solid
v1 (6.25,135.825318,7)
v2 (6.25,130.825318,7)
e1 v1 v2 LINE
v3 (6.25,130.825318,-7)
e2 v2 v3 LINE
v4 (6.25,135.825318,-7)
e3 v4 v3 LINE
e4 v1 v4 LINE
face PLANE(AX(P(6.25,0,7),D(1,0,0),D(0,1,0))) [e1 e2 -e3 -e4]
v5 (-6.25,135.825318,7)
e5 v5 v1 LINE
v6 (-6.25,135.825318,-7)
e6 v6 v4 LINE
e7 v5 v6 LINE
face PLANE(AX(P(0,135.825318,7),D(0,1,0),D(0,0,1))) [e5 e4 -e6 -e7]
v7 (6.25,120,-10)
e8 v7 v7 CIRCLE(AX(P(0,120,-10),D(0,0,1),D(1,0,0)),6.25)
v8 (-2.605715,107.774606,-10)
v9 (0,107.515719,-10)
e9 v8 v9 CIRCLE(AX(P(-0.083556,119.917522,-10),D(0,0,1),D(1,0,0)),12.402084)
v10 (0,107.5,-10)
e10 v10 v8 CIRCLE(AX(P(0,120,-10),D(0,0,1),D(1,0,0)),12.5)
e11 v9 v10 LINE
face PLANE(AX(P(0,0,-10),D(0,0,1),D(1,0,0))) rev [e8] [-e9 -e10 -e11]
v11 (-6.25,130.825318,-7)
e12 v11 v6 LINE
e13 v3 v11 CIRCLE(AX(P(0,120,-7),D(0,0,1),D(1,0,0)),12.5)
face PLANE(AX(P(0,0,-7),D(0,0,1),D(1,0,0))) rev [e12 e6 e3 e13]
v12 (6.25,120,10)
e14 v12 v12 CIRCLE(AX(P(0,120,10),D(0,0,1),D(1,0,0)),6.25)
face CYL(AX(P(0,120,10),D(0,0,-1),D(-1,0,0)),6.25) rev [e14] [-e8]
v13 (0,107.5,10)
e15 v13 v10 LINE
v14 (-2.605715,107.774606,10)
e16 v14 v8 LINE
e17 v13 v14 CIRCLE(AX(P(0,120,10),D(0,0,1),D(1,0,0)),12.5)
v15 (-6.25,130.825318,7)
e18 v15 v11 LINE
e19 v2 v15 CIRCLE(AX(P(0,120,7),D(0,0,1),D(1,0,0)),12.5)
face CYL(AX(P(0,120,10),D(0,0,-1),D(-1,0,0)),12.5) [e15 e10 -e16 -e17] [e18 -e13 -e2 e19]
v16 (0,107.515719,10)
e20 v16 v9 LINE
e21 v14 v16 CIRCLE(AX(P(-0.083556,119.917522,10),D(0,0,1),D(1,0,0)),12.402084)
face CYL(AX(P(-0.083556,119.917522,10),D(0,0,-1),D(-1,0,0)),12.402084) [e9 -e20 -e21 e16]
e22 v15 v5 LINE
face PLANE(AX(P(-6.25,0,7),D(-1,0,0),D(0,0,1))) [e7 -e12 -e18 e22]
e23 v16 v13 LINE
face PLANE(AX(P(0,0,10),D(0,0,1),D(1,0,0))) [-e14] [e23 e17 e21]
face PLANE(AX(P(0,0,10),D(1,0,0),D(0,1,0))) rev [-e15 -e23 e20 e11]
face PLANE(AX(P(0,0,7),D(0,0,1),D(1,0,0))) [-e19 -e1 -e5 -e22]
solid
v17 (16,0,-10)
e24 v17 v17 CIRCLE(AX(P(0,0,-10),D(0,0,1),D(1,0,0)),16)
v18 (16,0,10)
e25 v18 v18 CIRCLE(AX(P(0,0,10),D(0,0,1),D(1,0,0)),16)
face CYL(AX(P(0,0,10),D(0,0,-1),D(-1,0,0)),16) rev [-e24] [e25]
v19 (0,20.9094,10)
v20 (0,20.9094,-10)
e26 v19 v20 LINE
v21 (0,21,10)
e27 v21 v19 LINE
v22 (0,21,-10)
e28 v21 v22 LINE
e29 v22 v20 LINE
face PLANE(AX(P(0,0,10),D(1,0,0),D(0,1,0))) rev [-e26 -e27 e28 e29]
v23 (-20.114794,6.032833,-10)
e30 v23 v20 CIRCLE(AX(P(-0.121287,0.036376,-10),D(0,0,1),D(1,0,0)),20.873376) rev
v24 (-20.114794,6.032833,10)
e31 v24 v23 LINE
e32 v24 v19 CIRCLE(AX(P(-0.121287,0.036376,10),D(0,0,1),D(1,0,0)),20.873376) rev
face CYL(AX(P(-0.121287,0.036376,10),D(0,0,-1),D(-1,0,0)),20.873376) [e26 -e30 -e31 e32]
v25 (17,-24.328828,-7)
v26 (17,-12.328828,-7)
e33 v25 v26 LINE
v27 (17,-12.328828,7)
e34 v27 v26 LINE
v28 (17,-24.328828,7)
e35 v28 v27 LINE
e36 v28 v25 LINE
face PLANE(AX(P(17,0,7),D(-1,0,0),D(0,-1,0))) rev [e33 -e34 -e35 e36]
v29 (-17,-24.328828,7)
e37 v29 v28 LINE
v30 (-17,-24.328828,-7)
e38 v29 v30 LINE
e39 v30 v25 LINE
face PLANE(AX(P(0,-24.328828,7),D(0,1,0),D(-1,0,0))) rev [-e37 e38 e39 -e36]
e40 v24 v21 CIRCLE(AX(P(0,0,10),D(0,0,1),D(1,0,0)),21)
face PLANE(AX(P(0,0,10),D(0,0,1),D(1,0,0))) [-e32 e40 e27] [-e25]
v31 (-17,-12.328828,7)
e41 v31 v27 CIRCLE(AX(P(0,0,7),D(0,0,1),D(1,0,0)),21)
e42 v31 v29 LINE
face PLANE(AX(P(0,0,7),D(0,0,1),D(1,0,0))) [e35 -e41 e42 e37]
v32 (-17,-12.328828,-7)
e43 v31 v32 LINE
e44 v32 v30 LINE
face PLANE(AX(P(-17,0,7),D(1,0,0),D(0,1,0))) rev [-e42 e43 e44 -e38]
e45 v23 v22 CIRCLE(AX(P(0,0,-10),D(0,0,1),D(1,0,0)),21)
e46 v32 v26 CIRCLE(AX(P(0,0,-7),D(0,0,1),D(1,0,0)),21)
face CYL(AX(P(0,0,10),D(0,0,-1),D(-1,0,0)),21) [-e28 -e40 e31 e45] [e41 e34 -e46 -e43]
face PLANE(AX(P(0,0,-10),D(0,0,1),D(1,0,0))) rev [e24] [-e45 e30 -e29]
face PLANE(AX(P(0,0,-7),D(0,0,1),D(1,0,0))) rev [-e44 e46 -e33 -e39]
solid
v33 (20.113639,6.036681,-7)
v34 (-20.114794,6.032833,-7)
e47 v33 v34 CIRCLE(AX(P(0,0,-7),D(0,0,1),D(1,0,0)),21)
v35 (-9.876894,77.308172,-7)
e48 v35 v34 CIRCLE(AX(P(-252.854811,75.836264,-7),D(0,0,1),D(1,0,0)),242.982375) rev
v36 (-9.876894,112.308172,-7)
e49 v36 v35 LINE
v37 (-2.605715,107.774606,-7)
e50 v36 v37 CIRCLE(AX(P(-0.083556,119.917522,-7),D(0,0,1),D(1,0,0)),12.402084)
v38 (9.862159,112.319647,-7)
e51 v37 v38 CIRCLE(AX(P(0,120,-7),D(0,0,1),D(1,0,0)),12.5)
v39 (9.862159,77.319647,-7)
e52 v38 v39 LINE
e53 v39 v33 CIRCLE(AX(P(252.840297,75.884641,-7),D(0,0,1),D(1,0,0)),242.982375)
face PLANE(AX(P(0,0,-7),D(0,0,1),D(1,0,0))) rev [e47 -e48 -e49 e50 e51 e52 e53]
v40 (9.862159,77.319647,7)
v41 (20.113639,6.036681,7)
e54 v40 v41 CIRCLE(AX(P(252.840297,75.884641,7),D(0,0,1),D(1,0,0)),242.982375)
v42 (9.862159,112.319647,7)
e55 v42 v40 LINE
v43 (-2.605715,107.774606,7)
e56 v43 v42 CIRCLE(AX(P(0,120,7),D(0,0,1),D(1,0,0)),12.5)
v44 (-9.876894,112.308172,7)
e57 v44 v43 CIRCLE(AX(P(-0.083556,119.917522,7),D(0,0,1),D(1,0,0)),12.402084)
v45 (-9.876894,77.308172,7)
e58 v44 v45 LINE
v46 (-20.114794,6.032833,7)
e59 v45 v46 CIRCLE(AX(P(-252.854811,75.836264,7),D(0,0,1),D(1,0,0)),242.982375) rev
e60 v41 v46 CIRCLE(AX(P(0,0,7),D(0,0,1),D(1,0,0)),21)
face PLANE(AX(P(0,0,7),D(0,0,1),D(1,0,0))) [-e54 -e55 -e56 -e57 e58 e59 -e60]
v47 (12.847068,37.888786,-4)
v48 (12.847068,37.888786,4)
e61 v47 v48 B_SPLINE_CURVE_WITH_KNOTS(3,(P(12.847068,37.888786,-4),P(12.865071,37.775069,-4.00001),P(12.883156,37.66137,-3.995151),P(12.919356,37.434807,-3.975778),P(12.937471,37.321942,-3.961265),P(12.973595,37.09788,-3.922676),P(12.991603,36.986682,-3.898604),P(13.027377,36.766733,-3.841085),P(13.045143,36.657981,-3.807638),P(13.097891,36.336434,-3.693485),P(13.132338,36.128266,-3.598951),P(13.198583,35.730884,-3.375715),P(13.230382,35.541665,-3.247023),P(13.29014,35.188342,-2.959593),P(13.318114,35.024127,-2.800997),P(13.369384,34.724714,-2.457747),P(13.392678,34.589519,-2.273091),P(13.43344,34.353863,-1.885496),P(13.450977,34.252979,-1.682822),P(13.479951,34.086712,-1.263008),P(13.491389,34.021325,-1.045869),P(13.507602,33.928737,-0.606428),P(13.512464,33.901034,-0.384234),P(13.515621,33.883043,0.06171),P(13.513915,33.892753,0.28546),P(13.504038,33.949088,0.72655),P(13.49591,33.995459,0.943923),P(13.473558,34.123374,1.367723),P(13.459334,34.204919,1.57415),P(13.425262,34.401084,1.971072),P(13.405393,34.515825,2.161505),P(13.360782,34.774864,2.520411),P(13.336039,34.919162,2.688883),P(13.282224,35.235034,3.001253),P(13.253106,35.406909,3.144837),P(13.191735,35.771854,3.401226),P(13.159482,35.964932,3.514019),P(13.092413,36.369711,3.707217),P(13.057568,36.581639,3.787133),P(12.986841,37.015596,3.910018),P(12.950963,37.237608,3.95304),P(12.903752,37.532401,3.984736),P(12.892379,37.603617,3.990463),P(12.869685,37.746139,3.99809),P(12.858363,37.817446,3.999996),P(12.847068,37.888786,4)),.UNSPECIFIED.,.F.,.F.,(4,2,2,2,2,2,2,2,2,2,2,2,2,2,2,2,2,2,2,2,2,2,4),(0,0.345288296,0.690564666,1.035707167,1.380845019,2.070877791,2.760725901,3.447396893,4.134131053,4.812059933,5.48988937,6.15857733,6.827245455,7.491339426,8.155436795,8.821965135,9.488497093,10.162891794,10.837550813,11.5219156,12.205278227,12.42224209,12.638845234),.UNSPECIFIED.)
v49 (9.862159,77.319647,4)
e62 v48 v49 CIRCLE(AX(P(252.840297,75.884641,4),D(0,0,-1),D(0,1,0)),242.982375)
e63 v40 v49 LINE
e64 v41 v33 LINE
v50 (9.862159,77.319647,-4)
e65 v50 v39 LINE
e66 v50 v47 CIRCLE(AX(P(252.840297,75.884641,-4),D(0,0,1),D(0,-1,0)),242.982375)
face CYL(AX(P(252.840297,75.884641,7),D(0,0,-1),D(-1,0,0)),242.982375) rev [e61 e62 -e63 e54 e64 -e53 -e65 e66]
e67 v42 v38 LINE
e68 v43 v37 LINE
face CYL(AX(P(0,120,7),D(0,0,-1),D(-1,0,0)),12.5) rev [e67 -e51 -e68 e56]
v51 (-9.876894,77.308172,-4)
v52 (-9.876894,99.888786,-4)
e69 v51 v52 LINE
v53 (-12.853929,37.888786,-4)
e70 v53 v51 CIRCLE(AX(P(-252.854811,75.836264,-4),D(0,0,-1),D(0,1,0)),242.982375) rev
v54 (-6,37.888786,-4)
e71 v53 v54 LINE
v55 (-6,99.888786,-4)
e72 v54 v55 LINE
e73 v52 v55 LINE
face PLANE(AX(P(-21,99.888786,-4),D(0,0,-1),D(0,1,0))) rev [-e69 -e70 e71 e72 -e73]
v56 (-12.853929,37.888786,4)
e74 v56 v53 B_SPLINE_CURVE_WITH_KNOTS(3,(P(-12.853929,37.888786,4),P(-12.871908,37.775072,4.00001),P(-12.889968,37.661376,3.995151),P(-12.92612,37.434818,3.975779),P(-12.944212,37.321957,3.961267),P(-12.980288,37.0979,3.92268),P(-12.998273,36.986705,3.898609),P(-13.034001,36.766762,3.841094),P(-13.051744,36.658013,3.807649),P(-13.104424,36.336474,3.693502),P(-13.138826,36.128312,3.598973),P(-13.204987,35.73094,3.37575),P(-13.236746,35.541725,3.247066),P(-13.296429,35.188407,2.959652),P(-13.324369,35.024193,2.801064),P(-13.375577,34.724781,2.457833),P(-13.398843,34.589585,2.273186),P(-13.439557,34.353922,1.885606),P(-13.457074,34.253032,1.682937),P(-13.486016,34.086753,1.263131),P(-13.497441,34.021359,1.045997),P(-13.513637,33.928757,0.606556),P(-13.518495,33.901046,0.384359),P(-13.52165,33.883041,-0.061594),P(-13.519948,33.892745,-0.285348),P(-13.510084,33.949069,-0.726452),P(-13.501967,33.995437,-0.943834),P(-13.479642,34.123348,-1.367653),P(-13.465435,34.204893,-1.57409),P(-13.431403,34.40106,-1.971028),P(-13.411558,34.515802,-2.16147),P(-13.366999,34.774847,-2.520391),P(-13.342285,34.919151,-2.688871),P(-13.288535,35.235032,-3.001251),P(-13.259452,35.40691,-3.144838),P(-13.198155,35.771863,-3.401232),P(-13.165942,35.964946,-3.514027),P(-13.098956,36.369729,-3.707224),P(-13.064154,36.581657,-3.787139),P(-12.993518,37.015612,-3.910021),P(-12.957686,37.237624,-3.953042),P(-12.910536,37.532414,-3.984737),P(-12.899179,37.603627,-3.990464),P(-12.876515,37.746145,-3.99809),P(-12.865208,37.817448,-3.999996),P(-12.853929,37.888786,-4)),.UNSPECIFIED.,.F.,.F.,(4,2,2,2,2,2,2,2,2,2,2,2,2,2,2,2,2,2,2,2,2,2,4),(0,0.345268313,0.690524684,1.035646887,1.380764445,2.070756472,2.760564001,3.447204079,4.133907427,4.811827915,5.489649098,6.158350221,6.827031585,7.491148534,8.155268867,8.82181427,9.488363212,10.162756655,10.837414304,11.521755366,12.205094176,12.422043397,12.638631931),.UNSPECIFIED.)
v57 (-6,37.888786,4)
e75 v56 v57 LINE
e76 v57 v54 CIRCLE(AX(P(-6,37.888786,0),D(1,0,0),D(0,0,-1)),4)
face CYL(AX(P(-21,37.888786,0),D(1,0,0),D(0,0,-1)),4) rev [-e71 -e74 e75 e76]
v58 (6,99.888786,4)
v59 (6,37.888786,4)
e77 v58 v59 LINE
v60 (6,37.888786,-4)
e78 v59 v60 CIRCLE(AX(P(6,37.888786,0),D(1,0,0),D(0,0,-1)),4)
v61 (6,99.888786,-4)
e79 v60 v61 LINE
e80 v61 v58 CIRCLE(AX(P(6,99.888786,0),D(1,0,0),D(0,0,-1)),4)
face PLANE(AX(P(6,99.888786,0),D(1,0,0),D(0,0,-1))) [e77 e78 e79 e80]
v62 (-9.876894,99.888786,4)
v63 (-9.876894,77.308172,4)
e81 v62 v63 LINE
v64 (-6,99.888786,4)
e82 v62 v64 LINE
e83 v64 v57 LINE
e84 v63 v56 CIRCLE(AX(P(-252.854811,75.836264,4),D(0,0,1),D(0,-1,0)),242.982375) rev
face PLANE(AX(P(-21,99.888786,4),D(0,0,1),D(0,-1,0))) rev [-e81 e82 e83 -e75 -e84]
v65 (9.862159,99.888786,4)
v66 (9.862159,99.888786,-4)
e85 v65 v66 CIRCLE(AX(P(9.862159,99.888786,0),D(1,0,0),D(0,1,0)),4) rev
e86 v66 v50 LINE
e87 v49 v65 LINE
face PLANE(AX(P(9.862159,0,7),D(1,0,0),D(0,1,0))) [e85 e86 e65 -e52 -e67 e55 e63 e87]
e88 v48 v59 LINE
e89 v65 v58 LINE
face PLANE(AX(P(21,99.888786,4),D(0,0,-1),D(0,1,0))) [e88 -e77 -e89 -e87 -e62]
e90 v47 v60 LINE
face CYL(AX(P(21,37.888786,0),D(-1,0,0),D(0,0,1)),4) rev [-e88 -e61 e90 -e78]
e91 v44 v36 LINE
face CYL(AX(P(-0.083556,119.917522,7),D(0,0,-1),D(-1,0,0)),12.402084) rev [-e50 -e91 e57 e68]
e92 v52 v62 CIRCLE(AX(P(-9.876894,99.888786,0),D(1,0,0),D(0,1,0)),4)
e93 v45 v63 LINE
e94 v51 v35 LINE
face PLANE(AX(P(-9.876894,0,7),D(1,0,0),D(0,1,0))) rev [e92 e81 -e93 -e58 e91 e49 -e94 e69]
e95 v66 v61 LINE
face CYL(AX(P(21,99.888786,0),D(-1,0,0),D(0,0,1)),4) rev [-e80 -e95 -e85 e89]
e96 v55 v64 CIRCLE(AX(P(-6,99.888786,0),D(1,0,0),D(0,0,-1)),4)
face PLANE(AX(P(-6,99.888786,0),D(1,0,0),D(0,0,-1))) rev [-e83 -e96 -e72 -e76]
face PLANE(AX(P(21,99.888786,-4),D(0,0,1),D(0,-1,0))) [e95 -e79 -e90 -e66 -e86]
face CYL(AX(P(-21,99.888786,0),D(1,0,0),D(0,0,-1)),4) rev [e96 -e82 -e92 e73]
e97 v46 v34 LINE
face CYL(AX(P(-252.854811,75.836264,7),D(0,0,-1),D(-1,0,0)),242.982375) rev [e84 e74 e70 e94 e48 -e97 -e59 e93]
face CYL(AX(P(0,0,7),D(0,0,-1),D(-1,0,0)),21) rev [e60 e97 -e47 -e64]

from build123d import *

# Parameters (mm, degrees)
SKETCH2_R             = 6.25
BOSS_EXTRUDE4_DEPTH   = 10
SKETCH2_R_2           = 16
BOSS_EXTRUDE4_2_DEPTH = 10
BOSS_EXTRUDE5_START   = -7
BOSS_EXTRUDE5_DEPTH   = 14
BOSS_EXTRUDE5_2_DEPTH = 14
BOSS_EXTRUDE5_3_DEPTH = 14
CUT_EXTRUDE1_START    = 6
CUT_EXTRUDE1_DEPTH    = 132.802456026
CUT_EXTRUDE2_START    = -6
CUT_EXTRUDE2_DEPTH    = 132.802456026


# Read off the part's stored shape, not the designer's step: Boss-Extrude5
with BuildPart() as part:
    # Sketch2 → Boss-Extrude4 (new, symmetric)
    with BuildSketch(Plane.XY):
        with BuildLine():
            ThreePointArc((-2.605715405, 107.774606459), (-1.309709439, 107.576199752), (0, 107.515719446))
            Line((0, 107.515719446), (0, 107.5))
            ThreePointArc((0, 107.5), (1.310072658, 132.431158821), (-2.605715405, 107.774606459))
        make_face()
        with Locations((0, 120)):
            Circle(SKETCH2_R, mode=Mode.SUBTRACT)
    extrude(amount=BOSS_EXTRUDE4_DEPTH, both=True)

    # Boss-Extrude5 3 outline → Boss-Extrude5 3 (add)
    with BuildSketch(Plane.XY.offset(BOSS_EXTRUDE5_START)):
        with BuildLine():
            ThreePointArc((-6.25, 130.825317548), (0, 132.5), (6.25, 130.825317547))
            Line((6.25, 130.825317547), (6.25, 135.825317547))
            Line((6.25, 135.825317547), (-6.25, 135.825317547))
            Line((-6.25, 135.825317547), (-6.25, 130.825317548))
        make_face()
    extrude(amount=BOSS_EXTRUDE5_3_DEPTH)


with BuildPart() as body_2:
    # Sketch2 → Boss-Extrude4 2 (new, symmetric)
    with BuildSketch(Plane.XY):
        with BuildLine():
            ThreePointArc((20.113639143, 6.036681242), (12.534546141, 16.848891745), (0, 21))
            Line((0, 21), (0, 20.909399801))
            ThreePointArc((0, 20.909399801), (-12.533149824, 16.818613073), (-20.114793765, 6.032832817))
            ThreePointArc((-20.114793765, 6.032832817), (0.002008951, -20.999999904), (20.113639143, 6.036681242))
        make_face()
        Circle(SKETCH2_R_2, mode=Mode.SUBTRACT)
    extrude(amount=BOSS_EXTRUDE4_2_DEPTH, both=True)

    # Boss-Extrude5 2 outline → Boss-Extrude5 2 (add)
    with BuildSketch(Plane.XY.offset(BOSS_EXTRUDE5_START)):
        with BuildLine():
            Line((-17, -12.328828006), (-17, -24.328828006))
            Line((-17, -24.328828006), (17, -24.328828006))
            Line((17, -24.328828006), (17, -12.328828006))
            ThreePointArc((17, -12.328828006), (0, -21), (-17, -12.328828006))
        make_face()
    extrude(amount=BOSS_EXTRUDE5_2_DEPTH)


with BuildPart() as body_3:
    # Boss-Extrude5 outline → Boss-Extrude5 (new body)
    with BuildSketch(Plane.XY.offset(BOSS_EXTRUDE5_START)):
        with BuildLine():
            ThreePointArc((-9.876894189, 77.308172187), (-12.340920148, 41.289152602), (-20.114793765, 6.032832817))
            ThreePointArc((-20.114793765, 6.032832817), (-0.002008951, 20.999999904), (20.113639143, 6.036681242))
            ThreePointArc((20.113639143, 6.036681242), (12.332337725, 41.296257714), (9.862159173, 77.319647375))
            Line((9.862159173, 77.319647375), (9.862159173, 112.319647375))
            ThreePointArc((9.862159173, 112.319647375), (4.281161439, 108.25599486), (-2.605715405, 107.774606459))
            ThreePointArc((-2.605715405, 107.774606459), (-6.645276389, 109.393477757), (-9.876894189, 112.308172187))
            Line((-9.876894189, 112.308172187), (-9.876894189, 77.308172187))
        make_face()
    extrude(amount=BOSS_EXTRUDE5_DEPTH)

    # Sketch3 → Cut-Extrude1 (cut, through all)
    with BuildSketch(Plane(origin=(0, 0, 0), x_dir=(0, 0, -1), z_dir=(1, 0, 0)).offset(CUT_EXTRUDE1_START)):
        with BuildLine():
            Line((4, 99.888786358), (4, 37.888786358))
            ThreePointArc((4, 37.888786358), (0, 33.888786358), (-4, 37.888786358))
            Line((-4, 37.888786358), (-4, 99.888786358))
            ThreePointArc((-4, 99.888786358), (0, 103.888786358), (4, 99.888786358))
        make_face()
    extrude(amount=CUT_EXTRUDE1_DEPTH, mode=Mode.SUBTRACT)

    # Sketch3<2> → Cut-Extrude2 (cut, through all)
    with BuildSketch(Plane(origin=(0, 0, 0), x_dir=(0, 0, -1), z_dir=(1, 0, 0)).offset(CUT_EXTRUDE2_START)):
        with BuildLine():
            Line((4, 99.888786358), (4, 37.888786358))
            ThreePointArc((4, 37.888786358), (0, 33.888786358), (-4, 37.888786358))
            Line((-4, 37.888786358), (-4, 99.888786358))
            ThreePointArc((-4, 99.888786358), (0, 103.888786358), (4, 99.888786358))
        make_face()
    extrude(amount=-CUT_EXTRUDE2_DEPTH, mode=Mode.SUBTRACT)


solid = Compound([part.part, body_2.part, body_3.part])
